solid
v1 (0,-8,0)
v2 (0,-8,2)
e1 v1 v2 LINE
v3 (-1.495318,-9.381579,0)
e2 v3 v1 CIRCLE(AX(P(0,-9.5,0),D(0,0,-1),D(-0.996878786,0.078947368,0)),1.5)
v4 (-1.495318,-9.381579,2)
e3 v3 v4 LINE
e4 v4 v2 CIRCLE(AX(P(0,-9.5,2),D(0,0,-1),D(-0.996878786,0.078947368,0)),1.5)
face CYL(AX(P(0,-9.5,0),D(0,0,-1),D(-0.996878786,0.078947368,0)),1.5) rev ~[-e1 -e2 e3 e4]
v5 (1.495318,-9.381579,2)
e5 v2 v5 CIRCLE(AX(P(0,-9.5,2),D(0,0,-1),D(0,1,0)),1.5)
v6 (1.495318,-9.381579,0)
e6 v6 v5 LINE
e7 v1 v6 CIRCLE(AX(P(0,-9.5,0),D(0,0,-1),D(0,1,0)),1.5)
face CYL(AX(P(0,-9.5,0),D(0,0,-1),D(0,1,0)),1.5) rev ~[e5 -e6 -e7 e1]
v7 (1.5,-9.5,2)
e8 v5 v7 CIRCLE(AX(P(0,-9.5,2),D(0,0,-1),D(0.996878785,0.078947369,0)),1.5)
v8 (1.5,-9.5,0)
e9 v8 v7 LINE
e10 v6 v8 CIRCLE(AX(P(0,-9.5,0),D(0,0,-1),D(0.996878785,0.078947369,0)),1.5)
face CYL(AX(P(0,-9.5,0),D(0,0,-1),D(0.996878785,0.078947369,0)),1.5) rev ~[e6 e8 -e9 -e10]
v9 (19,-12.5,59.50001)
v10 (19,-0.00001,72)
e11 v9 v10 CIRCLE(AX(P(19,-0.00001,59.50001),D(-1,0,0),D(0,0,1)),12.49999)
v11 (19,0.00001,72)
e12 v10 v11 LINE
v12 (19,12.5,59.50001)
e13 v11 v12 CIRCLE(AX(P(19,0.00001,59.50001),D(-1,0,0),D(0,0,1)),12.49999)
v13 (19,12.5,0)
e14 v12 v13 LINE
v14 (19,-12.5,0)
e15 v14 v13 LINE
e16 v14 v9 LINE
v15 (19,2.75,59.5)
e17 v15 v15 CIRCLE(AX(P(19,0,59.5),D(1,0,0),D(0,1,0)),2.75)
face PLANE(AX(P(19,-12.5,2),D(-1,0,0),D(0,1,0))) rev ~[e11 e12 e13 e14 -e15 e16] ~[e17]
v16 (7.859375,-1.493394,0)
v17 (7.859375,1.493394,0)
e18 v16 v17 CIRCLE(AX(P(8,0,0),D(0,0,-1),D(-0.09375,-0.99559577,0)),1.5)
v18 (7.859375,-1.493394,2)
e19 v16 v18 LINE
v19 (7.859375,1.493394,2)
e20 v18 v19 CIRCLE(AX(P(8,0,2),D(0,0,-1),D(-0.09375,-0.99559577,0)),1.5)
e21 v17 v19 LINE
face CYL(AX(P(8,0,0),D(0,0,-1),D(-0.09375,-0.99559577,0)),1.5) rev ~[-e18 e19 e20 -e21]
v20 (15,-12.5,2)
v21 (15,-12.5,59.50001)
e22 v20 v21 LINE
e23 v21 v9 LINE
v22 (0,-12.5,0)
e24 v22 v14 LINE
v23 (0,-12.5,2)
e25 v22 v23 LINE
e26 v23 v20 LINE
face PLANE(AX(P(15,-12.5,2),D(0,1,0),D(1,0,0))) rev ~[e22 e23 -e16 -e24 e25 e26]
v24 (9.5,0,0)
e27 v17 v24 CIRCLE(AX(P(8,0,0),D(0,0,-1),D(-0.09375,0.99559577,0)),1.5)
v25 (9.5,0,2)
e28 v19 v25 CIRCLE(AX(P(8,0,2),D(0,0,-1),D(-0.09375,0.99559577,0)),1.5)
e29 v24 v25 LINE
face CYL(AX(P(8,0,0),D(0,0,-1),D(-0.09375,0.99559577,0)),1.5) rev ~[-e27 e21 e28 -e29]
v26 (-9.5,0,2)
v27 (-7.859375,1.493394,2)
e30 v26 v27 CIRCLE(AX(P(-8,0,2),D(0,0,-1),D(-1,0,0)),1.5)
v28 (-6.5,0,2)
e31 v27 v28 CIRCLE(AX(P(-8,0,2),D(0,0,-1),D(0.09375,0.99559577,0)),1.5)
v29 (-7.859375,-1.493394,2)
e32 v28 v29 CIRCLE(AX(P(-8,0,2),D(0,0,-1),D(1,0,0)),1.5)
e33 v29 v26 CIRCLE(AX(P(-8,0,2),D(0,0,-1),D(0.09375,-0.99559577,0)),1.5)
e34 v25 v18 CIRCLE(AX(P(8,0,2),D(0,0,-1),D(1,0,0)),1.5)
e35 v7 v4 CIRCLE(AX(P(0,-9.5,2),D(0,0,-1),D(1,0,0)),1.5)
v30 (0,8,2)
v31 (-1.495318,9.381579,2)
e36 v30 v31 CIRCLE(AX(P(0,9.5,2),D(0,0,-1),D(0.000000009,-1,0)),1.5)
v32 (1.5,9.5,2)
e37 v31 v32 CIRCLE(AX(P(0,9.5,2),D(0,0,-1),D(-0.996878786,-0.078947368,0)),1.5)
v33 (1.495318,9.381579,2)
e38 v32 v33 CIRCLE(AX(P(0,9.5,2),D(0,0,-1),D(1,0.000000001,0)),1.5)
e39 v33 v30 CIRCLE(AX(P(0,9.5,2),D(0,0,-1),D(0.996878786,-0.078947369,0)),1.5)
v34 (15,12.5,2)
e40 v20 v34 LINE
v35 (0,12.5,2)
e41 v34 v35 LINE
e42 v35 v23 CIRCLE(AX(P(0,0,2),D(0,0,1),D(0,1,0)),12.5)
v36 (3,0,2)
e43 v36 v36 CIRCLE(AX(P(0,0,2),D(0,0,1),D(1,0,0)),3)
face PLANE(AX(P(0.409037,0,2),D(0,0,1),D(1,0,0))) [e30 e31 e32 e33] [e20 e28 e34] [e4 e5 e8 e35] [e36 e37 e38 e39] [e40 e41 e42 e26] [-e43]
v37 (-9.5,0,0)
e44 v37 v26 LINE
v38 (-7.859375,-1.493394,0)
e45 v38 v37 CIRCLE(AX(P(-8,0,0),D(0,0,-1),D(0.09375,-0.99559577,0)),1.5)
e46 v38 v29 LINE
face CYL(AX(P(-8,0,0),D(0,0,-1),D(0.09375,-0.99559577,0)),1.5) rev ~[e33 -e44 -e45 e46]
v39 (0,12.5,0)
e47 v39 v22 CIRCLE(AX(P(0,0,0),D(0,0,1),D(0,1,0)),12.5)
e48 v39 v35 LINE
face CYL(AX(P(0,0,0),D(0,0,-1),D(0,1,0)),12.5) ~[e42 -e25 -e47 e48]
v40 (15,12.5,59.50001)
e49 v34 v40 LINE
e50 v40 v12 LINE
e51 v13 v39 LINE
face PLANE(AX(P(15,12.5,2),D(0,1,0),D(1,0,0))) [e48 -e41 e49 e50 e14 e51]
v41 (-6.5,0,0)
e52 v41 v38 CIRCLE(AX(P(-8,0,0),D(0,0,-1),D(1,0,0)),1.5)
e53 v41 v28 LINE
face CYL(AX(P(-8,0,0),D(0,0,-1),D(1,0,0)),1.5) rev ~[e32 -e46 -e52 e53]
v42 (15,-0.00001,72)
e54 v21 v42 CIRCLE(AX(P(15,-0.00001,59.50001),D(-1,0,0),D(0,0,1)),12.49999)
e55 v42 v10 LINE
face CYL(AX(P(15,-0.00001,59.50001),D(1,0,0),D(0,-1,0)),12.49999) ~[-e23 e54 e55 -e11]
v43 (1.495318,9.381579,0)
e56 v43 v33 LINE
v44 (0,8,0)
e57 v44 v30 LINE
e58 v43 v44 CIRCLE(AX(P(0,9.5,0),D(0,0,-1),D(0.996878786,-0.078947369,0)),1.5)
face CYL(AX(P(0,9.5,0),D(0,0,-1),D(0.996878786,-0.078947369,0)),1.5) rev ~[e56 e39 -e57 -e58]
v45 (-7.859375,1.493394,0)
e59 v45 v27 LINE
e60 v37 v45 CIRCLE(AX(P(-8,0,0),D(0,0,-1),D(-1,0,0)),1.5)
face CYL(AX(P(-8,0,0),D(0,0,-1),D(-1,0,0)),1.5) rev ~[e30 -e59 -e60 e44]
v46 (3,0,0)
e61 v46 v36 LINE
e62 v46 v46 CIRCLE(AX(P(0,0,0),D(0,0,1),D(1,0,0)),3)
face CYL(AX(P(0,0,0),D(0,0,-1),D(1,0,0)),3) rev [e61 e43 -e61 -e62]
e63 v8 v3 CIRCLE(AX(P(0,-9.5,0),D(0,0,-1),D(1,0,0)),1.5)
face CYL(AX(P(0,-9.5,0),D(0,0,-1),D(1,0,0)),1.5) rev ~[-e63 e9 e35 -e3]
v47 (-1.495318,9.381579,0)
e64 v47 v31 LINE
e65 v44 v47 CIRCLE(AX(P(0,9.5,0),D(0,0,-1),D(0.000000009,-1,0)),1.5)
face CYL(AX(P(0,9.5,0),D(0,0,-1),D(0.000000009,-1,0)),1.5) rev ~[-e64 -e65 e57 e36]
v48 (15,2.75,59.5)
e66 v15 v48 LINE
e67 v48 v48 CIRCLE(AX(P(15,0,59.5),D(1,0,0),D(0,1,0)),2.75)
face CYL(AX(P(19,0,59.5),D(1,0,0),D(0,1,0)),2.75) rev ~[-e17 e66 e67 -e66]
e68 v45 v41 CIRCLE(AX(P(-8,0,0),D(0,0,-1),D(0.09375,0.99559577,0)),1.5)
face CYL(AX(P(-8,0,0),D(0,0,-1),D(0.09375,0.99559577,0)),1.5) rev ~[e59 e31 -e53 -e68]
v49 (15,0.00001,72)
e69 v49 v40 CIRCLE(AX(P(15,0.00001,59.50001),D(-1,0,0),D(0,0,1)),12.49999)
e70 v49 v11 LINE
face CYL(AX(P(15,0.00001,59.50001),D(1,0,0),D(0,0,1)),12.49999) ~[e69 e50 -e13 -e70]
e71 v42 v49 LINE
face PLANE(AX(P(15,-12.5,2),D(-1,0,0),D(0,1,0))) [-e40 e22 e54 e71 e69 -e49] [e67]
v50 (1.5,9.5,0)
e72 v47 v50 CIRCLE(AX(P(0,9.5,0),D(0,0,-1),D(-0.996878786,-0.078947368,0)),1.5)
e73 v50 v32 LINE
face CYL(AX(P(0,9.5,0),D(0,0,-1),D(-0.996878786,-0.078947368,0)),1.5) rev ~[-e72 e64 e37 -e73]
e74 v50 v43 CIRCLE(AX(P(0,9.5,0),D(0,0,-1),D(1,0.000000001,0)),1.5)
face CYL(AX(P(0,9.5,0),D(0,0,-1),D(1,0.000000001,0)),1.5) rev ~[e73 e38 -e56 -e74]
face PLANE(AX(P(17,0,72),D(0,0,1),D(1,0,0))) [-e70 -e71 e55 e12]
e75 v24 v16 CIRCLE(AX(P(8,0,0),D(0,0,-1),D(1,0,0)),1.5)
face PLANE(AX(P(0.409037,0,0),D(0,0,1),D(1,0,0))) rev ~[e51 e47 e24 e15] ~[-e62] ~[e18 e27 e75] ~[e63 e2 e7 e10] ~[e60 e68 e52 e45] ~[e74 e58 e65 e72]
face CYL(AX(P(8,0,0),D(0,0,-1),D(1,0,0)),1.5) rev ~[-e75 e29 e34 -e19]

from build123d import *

# Parameters (mm, degrees)
F0_R     = 3
F1_DEPTH = 2
F2_W     = 4
F2_H     = 25
F3_DEPTH = 70
F4_R     = 2.75
F5_DEPTH = 31.501
F6_R     = 12.49999


# Not quite as in the source:
# - a fillet or chamfer is up to 0.001 mm smaller than in the source, because OpenCascade refuses the exact size
# - a feature names something its author has since deleted; it is built from what else it names


with BuildPart() as f1:
    # F0 (on Top) → F1 (new body)
    with BuildSketch(Plane.XY):
        with BuildLine():
            ThreePointArc((0, -12.5), (8.8388347648, -8.8388347648), (12.5, 0))
            ThreePointArc((12.5, 0), (8.8388347648, 8.8388347648), (0, 12.5))
            ThreePointArc((0, 12.5), (-12.5, 0), (0, -12.5))
        make_face()
        with BuildLine():
            ThreePointArc((1.4953181783, 9.3815789474), (7.2268777039, 6.1662175321), (9.5, 0))
            ThreePointArc((9.5, 0), (7.2268777039, -6.1662175321), (1.4953181783, -9.3815789474))
            ThreePointArc((1.4953181783, -9.3815789474), (1.4988290876, -9.4407432173), (1.5, -9.5))
            ThreePointArc((1.5, -9.5), (-0.0592567827, -10.9988290876), (-1.4953181783, -9.3815789474))
            ThreePointArc((-1.4953181783, -9.3815789474), (-7.2268777039, -6.1662175321), (-9.5, 0))
            ThreePointArc((-9.5, 0), (-7.2268777039, 6.1662175321), (-1.4953181783, 9.3815789474))
            ThreePointArc((-1.4953181783, 9.3815789474), (-0.0592567827, 10.9988290876), (1.5, 9.5))
            ThreePointArc((1.5, 9.5), (1.4988290876, 9.4407432173), (1.4953181783, 9.3815789474))
        make_face(mode=Mode.SUBTRACT)
        with BuildLine():
            ThreePointArc((0, 12.5), (8.8388347648, 8.8388347648), (12.5, 0))
            ThreePointArc((12.5, 0), (8.8388347648, -8.8388347648), (0, -12.5))
            Line((0, -12.5), (19, -12.5))
            Line((19, -12.5), (19, 12.5))
            Line((19, 12.5), (0, 12.5))
        make_face()
        with BuildLine():
            ThreePointArc((7.859375, -1.4933936552), (6.5, 0), (7.859375, 1.4933936552))
            ThreePointArc((7.859375, 1.4933936552), (5.1016100823, 6.1622702446), (1.34e-08, 8))
            ThreePointArc((1.34e-08, 8), (-5.101610072, 6.1622702532), (-7.859375, 1.4933936552))
            ThreePointArc((-7.859375, 1.4933936552), (-6.8907350407, 1.0097184013), (-6.5, 0))
            ThreePointArc((-6.5, 0), (-6.8907350407, -1.0097184013), (-7.859375, -1.4933936552))
            ThreePointArc((-7.859375, -1.4933936552), (-5.1016100771, -6.1622702489), (0, -8))
            ThreePointArc((0, -8), (5.1016100771, -6.1622702489), (7.859375, -1.4933936552))
        make_face()
        Circle(F0_R, mode=Mode.SUBTRACT)
        with BuildLine():
            ThreePointArc((7.859375, 1.4933936552), (9.0097184013, 1.1092649593), (9.5, 0))
            ThreePointArc((9.5, 0), (7.2268777039, 6.1662175321), (1.4953181783, 9.3815789474))
            ThreePointArc((1.4953181783, 9.3815789474), (1.0179313437, 8.3982669201), (1.34e-08, 8))
            ThreePointArc((1.34e-08, 8), (5.1016100823, 6.1622702446), (7.859375, 1.4933936552))
        make_face()
        with BuildLine():
            ThreePointArc((1.4953181783, -9.3815789474), (7.2268777039, -6.1662175321), (9.5, 0))
            ThreePointArc((9.5, 0), (9.0097184013, -1.1092649593), (7.859375, -1.4933936552))
            ThreePointArc((7.859375, -1.4933936552), (5.1016100771, -6.1622702489), (0, -8))
            ThreePointArc((0, -8), (1.0179313388, -8.3982669155), (1.4953181783, -9.3815789474))
        make_face()
        with BuildLine():
            ThreePointArc((1.34e-08, 8), (-1.0179313339, 8.3982669109), (-1.4953181783, 9.3815789474))
            ThreePointArc((-1.4953181783, 9.3815789474), (-7.2268777039, 6.1662175321), (-9.5, 0))
            ThreePointArc((-9.5, 0), (-9.0097184013, 1.1092649593), (-7.859375, 1.4933936552))
            ThreePointArc((-7.859375, 1.4933936552), (-5.101610072, 6.1622702532), (1.34e-08, 8))
        make_face()
        with BuildLine():
            ThreePointArc((-9.5, 0), (-7.2268777039, -6.1662175321), (-1.4953181783, -9.3815789474))
            ThreePointArc((-1.4953181783, -9.3815789474), (-1.0179313388, -8.3982669155), (0, -8))
            ThreePointArc((0, -8), (-5.1016100771, -6.1622702489), (-7.859375, -1.4933936552))
            ThreePointArc((-7.859375, -1.4933936552), (-9.0097184013, -1.1092649593), (-9.5, 0))
        make_face()
    extrude(amount=F1_DEPTH)

    # F2 (on face) → F3 (join)
    with BuildSketch(Plane.XY.offset(2)):
        with Locations((17, 0)):
            Rectangle(F2_W, F2_H)
    extrude(amount=F3_DEPTH)

    # F4 (on face) → F5 (cut, through all)
    with BuildSketch(Plane.YZ.offset(19)):
        with Locations((0, 59.5)):
            Circle(F4_R)
    extrude(amount=-F5_DEPTH, mode=Mode.SUBTRACT)

    # F6 (radius 12.5 in the source; OpenCascade refuses exactly that, so slightly less here)
    f6_edges = [f1.edges().sort_by_distance(p)[0] for p in [
        (17, -12.5, 72),
        (17, 12.5, 72),
    ]]
    fillet(f6_edges, radius=F6_R)


solid = f1.part
